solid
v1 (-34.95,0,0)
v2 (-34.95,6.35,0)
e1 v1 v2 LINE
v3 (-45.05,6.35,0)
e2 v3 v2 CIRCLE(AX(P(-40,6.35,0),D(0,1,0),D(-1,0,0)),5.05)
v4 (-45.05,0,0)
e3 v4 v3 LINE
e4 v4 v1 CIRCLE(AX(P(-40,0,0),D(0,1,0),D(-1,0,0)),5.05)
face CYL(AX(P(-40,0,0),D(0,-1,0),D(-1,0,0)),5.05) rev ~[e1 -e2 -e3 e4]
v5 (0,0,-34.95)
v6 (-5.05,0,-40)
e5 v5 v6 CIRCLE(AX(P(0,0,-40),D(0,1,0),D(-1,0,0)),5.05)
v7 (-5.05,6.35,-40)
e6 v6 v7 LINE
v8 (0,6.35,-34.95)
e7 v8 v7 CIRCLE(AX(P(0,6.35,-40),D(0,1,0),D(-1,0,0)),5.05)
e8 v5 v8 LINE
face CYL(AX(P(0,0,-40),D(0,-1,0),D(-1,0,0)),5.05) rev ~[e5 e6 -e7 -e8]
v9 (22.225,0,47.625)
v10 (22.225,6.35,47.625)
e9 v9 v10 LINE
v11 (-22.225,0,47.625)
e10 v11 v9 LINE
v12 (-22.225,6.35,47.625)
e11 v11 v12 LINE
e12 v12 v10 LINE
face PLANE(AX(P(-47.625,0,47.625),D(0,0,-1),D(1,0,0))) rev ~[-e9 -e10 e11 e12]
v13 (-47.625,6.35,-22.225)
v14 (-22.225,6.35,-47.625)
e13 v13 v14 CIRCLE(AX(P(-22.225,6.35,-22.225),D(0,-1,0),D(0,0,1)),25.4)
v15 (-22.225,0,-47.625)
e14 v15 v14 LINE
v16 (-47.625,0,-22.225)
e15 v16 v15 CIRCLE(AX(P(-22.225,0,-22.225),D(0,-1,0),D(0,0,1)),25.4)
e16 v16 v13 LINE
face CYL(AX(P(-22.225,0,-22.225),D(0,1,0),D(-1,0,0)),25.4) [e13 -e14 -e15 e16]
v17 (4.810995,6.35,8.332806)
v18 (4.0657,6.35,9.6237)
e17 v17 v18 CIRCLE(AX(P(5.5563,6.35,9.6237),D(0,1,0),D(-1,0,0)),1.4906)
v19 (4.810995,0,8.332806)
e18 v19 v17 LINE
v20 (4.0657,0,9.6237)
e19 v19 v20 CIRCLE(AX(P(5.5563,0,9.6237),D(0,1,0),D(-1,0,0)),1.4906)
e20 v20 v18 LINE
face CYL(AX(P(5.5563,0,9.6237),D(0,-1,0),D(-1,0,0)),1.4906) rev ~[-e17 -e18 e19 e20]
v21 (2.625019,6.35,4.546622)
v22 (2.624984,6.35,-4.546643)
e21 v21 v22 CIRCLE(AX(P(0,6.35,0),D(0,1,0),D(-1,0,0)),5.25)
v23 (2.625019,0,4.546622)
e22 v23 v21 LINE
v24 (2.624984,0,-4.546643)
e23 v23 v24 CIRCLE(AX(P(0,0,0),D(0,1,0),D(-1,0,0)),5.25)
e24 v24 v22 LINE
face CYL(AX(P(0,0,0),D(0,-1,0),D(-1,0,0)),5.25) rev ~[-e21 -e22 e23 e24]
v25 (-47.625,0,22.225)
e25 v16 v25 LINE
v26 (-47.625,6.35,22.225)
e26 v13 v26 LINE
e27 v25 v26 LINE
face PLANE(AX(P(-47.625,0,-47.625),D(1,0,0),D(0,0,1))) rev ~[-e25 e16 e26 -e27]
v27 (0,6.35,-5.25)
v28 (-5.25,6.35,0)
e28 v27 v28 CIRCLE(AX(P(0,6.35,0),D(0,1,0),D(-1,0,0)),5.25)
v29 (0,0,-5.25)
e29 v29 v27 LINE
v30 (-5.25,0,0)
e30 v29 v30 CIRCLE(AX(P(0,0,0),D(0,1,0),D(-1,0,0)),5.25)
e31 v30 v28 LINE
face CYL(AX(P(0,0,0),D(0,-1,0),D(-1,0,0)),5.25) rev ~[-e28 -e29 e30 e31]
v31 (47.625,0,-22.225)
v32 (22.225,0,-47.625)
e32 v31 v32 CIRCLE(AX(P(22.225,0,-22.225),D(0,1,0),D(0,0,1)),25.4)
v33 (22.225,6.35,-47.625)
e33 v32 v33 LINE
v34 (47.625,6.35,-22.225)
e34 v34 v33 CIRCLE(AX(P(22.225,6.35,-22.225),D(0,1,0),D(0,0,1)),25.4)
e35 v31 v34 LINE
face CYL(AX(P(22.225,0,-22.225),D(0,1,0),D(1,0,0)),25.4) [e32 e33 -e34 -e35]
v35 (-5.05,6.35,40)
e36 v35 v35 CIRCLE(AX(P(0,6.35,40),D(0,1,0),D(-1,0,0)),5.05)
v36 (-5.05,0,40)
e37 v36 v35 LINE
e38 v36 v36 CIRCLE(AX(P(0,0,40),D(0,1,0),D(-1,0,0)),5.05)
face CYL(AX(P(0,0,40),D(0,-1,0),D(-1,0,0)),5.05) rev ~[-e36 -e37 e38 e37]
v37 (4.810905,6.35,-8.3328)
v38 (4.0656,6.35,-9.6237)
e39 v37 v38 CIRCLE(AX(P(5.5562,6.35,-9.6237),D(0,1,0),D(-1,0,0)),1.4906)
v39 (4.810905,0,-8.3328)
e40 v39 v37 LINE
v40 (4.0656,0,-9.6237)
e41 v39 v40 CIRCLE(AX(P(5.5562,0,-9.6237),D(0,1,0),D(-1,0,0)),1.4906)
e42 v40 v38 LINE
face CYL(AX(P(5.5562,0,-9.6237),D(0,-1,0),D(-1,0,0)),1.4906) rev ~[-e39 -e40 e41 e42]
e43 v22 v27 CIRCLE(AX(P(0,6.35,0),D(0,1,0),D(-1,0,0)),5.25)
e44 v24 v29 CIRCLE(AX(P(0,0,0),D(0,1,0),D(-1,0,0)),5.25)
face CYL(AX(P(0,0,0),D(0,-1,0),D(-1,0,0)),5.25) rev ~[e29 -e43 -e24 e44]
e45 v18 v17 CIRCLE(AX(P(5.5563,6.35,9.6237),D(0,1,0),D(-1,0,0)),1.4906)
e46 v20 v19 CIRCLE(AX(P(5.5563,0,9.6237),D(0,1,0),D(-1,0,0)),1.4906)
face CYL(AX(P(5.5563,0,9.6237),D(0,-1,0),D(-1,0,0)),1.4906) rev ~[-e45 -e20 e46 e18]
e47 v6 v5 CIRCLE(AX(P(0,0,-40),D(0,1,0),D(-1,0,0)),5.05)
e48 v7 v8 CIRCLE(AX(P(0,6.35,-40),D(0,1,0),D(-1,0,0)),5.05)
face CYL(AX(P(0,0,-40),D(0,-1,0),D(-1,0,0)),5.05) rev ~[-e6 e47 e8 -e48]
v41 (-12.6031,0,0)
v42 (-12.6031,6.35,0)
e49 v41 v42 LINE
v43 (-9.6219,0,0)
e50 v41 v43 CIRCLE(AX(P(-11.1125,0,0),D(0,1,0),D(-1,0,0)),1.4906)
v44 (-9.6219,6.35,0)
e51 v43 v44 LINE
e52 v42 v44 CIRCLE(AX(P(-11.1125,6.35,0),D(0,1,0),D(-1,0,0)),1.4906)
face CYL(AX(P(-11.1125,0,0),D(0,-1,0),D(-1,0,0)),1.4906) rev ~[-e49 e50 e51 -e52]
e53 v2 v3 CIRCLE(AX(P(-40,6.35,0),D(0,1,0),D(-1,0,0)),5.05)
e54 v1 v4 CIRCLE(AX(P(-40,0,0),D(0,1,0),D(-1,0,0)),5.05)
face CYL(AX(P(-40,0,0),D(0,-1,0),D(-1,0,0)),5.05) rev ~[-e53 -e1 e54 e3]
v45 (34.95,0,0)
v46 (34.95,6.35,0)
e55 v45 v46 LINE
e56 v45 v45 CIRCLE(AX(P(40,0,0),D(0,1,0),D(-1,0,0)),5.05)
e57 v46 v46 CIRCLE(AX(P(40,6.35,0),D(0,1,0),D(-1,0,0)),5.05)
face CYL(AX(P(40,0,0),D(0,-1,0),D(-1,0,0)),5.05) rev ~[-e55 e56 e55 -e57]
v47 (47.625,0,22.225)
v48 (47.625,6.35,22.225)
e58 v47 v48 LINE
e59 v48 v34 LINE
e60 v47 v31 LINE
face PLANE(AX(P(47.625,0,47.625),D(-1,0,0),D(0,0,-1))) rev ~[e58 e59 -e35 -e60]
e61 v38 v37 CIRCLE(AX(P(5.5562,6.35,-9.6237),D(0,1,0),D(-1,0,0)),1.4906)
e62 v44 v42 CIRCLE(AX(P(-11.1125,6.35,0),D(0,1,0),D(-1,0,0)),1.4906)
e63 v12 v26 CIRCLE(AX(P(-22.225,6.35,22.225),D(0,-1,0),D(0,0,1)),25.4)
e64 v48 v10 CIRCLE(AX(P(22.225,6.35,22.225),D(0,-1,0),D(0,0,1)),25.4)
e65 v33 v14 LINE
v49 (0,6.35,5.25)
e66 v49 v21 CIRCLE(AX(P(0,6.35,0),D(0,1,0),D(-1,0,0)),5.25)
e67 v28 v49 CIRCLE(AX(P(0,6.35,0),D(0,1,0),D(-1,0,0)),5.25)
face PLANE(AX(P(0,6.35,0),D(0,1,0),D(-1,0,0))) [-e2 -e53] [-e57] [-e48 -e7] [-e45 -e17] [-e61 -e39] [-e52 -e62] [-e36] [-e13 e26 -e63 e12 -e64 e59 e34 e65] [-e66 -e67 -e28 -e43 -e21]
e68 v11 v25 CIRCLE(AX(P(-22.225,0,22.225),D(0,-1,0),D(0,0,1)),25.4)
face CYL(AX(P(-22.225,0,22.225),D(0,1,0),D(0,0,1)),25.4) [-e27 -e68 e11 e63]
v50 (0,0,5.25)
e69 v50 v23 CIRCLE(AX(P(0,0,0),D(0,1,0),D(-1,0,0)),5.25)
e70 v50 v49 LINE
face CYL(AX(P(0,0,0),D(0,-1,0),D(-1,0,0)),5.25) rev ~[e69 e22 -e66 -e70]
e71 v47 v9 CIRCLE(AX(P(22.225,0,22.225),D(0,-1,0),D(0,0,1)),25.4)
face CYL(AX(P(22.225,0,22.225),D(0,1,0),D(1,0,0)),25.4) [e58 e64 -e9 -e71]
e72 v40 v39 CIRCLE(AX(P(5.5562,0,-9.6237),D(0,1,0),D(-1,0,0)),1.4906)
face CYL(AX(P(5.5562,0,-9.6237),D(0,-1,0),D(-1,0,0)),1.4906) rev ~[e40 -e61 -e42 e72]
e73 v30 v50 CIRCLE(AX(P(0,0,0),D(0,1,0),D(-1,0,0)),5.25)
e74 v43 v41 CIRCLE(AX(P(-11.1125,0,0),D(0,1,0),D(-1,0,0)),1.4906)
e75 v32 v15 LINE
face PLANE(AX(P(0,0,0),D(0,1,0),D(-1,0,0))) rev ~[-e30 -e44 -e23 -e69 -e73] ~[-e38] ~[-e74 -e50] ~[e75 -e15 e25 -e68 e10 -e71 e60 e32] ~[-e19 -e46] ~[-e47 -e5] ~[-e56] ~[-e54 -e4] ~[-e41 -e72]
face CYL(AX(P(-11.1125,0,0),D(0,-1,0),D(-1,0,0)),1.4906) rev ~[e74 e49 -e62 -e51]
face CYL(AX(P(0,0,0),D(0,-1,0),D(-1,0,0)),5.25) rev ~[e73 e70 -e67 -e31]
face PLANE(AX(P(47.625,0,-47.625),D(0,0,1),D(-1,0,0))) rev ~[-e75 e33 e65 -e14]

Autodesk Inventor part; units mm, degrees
ref_plane "YZ Plane" through (0, 0, 0) normal (1, 0, 0) x (0, 1, 0)
ref_plane "XZ Plane" through (0, 0, 0) normal (0, 1, 0) x (-1, 0, 0)
ref_plane "XY Plane" through (0, 0, 0) normal (0, 0, 1) x (1, 0, 0)
sketch "Sketch3" plane through (0, 0, 0) normal (0, 1, 0) x (-1, 0, 0)
  circle A0 centre (11.1125, 0) radius 1.4906
  circle A1 centre (-5.5563, 9.6237) radius 1.4906
  circle A2 centre (-5.5562, -9.6237) radius 1.4906
  circle A3 centre (0, 0) radius 5.25
  line L0 (0, 0) -> (11.1125, 0)
  line L1 (0, 0) -> (-5.5563, 9.6237)
  line L2 (0, 0) -> (-5.5562, -9.6237)
  line L3 (0, 11.7306) -> (0, -34.9786)
  line L4 (38.6398, 0) -> (-3.2951, 0)
  circle A4 centre (40, 0) radius 5.05
  circle A5 centre (0, -40) radius 5.05
  circle A6 centre (0, 40) radius 5.05
  circle A7 centre (-40, 0) radius 5.05
  line L5 (-47.625, -47.625) -> (47.625, -47.625)
  line L6 (47.625, -47.625) -> (47.625, 47.625)
  line L7 (47.625, 47.625) -> (-47.625, 47.625)
  line L8 (-47.625, 47.625) -> (-47.625, -47.625)
  line L9 (-47.625, -47.625) -> (47.625, 47.625) construction
  line L10 (47.625, -47.625) -> (-47.625, 47.625) construction
  dimension "d19" = 120
  dimension "d20" = 120
  dimension "d21" = 11.1125
  dimension "d22" = 11.1125
  dimension "d23" = 11.1125
  dimension "d24" = 2.9811
  dimension "d25" = 2.9811
  dimension "d26" = 2.9811
  dimension "d27" = 80
  dimension "d28" = 80
  dimension "d29" = 10.1
  dimension "d30" = 10.1
  dimension "d31" = 95.25
  dimension "d32" = 95.25
  dimension "d36" = 10.5
extrude "Extrusion6" add sketch "Sketch3" along normal blind 6.35
fillet "Fillet1" radius 25.4 4 edges at (-47.625, 3.175, 47.625) (47.625, 3.175, 47.625) (47.625, 3.175, -47.625) (-47.625, 3.175, -47.625)
equation "\"d22\" = d21"
equation "\"d23\" = d21"
equation "\"d25\" = d24"
equation "\"d26\" = d24"
equation "\"d28\" = d27"
equation "\"d30\" = d29"
equation "\"d32\" = d31"
properties part number "Vertical_Lead_Screw_Plate"
